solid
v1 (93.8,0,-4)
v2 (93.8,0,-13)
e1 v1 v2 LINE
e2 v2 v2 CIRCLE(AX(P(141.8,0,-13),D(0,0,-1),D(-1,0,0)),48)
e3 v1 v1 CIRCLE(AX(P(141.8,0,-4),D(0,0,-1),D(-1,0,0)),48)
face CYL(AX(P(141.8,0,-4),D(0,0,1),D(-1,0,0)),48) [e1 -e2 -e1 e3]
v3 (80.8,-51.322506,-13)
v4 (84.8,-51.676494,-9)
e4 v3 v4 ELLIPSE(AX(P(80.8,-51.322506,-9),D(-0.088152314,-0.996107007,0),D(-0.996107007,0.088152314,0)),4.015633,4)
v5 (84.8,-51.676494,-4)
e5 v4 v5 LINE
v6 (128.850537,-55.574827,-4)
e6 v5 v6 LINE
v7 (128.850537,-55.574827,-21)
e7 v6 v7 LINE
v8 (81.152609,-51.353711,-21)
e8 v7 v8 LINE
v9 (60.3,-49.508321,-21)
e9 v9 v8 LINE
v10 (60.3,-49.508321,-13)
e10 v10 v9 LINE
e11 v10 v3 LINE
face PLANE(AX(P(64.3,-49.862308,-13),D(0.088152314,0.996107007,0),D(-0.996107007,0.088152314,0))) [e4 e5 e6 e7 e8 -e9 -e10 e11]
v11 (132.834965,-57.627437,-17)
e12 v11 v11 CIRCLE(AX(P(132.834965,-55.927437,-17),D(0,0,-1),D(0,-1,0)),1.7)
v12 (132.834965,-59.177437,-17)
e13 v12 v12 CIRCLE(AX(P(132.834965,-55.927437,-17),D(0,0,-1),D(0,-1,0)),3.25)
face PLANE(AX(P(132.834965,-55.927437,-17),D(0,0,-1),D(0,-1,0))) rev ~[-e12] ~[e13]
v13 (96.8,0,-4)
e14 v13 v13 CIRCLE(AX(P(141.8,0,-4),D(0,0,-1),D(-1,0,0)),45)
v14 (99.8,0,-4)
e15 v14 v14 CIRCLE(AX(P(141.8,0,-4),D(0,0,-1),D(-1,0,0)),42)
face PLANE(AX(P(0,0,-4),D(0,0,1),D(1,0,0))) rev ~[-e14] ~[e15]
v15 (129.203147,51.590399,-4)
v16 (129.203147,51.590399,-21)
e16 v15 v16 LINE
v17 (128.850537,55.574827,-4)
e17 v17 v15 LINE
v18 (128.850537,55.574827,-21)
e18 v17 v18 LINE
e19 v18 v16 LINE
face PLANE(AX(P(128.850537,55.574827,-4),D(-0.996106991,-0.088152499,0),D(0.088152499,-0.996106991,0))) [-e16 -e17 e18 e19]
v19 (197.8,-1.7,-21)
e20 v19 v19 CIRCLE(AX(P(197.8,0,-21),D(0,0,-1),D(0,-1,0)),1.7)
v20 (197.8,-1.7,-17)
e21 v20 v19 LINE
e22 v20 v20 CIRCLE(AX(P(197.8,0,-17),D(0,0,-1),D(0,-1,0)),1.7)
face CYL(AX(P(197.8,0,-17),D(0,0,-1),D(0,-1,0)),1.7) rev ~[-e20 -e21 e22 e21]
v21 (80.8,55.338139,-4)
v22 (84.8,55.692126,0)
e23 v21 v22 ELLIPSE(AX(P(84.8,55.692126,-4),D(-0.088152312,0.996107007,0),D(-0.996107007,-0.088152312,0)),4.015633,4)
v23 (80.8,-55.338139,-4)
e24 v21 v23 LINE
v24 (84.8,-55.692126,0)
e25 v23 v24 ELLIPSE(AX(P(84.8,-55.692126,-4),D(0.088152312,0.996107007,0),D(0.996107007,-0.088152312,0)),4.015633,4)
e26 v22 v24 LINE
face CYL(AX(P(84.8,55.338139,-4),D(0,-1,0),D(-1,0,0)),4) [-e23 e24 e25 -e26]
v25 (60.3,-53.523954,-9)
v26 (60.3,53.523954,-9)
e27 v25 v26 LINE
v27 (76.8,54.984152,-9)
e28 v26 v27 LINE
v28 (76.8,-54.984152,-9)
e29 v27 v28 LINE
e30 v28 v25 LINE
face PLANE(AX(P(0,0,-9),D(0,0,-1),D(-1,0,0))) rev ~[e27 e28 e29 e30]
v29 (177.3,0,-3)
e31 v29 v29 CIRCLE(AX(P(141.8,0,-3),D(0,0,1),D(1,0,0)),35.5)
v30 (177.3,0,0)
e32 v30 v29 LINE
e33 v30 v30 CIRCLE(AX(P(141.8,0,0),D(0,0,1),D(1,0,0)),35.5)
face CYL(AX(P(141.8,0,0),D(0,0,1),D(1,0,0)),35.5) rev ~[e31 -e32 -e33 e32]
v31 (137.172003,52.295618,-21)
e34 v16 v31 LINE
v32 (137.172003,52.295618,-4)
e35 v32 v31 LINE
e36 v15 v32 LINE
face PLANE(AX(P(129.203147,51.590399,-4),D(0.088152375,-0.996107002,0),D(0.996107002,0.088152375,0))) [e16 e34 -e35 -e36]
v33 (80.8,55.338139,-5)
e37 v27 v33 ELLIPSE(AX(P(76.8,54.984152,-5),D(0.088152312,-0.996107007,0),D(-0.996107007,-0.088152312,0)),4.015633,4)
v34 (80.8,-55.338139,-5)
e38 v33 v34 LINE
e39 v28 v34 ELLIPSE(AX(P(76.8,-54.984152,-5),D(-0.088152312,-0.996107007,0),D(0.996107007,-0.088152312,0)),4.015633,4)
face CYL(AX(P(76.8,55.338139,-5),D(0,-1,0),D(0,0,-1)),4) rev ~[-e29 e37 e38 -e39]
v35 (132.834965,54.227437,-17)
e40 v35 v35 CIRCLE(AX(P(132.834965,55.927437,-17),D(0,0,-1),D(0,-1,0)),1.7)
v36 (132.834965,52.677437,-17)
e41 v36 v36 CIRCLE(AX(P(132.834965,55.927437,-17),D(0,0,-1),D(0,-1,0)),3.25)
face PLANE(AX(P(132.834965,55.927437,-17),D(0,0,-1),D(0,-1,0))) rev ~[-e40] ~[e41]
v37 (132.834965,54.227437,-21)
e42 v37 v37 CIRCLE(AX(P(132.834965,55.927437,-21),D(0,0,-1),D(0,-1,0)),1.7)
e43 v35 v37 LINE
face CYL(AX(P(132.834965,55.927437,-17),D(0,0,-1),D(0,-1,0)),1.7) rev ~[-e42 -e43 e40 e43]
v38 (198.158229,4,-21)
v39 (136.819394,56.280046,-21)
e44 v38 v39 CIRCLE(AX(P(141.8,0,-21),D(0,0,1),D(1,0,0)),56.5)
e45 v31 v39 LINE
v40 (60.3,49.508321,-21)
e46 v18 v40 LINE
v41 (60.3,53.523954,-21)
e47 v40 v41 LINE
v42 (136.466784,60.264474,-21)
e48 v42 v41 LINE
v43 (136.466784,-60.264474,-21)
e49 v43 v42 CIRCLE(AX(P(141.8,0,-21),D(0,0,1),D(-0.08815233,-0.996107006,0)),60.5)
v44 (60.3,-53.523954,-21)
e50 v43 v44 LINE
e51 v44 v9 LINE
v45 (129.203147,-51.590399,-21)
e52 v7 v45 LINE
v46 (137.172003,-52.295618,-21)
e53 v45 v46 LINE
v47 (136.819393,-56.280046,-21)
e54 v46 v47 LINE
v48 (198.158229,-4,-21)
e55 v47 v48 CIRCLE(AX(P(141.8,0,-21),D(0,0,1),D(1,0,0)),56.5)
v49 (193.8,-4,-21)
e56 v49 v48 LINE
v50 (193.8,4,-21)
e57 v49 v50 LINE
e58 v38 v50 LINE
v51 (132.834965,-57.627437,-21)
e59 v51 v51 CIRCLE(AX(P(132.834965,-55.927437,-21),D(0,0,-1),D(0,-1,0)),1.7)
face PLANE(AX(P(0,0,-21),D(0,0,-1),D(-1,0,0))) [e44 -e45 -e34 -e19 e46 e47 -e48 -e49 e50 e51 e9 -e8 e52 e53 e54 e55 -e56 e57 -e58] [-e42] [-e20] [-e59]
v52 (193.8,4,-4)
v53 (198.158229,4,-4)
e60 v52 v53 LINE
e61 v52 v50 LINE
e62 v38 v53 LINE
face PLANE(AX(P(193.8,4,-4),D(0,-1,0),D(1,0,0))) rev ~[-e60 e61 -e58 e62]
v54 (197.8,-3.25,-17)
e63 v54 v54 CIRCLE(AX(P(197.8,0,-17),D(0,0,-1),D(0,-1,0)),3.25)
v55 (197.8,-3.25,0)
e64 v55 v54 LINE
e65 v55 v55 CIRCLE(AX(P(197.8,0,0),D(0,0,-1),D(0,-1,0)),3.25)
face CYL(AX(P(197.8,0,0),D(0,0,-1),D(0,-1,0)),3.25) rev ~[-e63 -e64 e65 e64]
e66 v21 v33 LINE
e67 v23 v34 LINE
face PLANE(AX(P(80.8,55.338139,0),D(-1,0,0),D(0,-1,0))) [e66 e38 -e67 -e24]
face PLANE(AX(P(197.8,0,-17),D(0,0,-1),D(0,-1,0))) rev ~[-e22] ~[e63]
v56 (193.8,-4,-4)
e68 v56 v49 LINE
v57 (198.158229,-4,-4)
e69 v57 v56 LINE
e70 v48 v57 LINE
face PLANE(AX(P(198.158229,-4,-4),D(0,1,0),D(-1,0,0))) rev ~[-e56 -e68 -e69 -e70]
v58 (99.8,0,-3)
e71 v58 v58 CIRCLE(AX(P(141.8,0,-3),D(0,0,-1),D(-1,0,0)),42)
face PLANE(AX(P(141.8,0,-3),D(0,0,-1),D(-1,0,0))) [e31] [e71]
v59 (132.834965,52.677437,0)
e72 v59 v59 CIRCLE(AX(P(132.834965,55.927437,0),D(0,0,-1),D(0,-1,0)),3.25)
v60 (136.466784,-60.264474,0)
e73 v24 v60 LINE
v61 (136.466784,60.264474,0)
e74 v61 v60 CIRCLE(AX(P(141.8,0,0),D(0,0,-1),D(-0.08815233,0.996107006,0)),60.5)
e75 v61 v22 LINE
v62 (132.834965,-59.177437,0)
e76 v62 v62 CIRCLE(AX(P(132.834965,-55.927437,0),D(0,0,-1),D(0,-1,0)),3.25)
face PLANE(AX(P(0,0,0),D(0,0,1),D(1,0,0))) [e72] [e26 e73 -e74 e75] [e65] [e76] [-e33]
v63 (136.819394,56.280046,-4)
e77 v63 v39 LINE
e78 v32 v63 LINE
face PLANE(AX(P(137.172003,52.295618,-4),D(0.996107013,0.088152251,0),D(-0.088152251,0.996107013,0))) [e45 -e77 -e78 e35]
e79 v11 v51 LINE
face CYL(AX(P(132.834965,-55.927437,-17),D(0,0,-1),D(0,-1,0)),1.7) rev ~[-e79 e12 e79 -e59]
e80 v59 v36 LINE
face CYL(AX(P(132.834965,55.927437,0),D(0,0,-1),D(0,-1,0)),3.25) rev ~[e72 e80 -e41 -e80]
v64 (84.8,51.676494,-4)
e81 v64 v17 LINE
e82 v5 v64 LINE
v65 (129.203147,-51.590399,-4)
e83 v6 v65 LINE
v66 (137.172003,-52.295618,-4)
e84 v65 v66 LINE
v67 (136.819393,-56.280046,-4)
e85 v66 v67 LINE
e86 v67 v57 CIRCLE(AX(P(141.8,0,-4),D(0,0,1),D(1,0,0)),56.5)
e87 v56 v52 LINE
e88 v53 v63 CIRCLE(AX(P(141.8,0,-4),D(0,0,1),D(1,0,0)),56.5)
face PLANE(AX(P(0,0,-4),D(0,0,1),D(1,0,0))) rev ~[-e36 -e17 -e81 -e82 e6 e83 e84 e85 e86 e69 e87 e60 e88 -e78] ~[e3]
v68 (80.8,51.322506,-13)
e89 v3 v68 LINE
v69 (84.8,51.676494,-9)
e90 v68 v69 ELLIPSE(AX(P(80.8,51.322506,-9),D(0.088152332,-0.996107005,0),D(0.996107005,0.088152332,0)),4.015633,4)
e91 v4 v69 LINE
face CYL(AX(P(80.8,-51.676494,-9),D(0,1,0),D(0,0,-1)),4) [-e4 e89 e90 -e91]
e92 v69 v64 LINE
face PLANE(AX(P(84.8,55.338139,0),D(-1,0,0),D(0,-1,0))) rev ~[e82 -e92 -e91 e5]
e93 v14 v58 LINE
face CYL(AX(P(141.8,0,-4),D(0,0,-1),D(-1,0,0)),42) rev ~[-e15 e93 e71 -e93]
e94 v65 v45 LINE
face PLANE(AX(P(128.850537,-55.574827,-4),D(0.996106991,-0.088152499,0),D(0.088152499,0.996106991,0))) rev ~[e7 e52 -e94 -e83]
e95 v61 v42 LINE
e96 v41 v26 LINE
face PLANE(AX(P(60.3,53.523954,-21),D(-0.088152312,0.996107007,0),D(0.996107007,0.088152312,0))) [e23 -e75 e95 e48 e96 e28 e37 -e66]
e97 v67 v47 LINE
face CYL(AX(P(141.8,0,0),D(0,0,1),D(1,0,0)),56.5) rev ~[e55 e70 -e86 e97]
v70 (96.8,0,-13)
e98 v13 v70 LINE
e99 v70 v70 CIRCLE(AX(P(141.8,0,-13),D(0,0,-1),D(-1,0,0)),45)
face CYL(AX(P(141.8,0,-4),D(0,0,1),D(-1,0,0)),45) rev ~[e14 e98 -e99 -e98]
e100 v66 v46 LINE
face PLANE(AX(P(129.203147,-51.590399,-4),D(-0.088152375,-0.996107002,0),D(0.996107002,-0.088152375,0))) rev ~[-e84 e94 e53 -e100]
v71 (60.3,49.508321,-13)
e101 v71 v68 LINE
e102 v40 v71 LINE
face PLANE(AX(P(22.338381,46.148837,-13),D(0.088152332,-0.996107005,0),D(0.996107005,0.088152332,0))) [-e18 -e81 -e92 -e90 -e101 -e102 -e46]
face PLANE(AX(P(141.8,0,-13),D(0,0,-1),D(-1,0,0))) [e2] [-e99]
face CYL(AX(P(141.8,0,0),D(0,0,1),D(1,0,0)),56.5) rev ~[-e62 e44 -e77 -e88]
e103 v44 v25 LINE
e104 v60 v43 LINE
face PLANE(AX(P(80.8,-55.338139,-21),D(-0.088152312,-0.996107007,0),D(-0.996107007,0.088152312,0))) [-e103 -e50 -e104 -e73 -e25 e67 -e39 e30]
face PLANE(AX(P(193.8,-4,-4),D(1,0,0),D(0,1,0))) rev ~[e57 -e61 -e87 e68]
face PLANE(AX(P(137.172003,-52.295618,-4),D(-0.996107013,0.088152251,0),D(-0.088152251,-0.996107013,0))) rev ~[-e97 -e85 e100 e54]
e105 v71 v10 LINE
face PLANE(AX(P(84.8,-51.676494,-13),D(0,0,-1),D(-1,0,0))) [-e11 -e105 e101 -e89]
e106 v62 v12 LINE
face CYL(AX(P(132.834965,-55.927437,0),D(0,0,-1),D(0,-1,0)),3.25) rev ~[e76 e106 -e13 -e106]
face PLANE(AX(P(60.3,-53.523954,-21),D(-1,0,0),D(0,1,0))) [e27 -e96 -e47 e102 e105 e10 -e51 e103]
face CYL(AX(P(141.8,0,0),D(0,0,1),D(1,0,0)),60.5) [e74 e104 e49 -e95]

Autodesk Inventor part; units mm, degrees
ref_plane "YZ Plane" through (0, 0, 0) normal (1, 0, 0) x (0, 1, 0)
ref_plane "XZ Plane" through (0, 0, 0) normal (0, 1, 0) x (-1, 0, 0)
ref_plane "XY Plane" through (0, 0, 0) normal (0, 0, 1) x (1, 0, 0)
sketch "Sketch1" plane through (0, 0, 0) normal (0, 0, 1) x (1, 0, 0)
  circle A0 centre (0, 0) radius 48
  circle A1 centre (141.8, 0) radius 60.5
  line L0 (136.466784, 60.264474) -> (-4.231312, 47.813136)
  line L1 (-4.231312, -47.813136) -> (136.466784, -60.264474)
  line L2 (80.8, 55.338139) -> (80.8, -55.338139)
  dimension "d0" = 96
  dimension "d1" = 121
  dimension "d2" = 141.8
  dimension "d3" = 61
extrude "Extrusion1" add sketch "Sketch1" against normal blind 21 contours L0 A1 L1 L2 | A1
sketch "Sketch2" plane through (0, 0, -21) normal (0, 0, -1) x (-1, 0, 0)
  line L0 (-80.8, -55.338139) -> (-60.3, -53.523954)
  line L1 (-60.3, -53.523954) -> (-60.3, 53.523954)
  line L2 (-60.3, 53.523954) -> (-80.8, 55.338139)
  line L3 (-80.8, 55.338139) -> (-80.8, -55.338139)
  line L4 (-136.466784, -60.264474) -> (-80.8, -55.338139)
  line L5 (-80.8, 55.338139) -> (-136.466784, 60.264474)
  line L6 (-80.8, -55.338139) -> (-80.8, 55.338139)
  point P0 (0, 0)
  dimension "d7" = 20.5
extrude "Extrusion2" add sketch "Sketch2" against normal blind 12
shell "Shell1" thickness 4 removed faces 1 at (111.077856, 17.841318, -21)
sketch "Sketch3" plane through (141.8, 0, -4) normal (0, 0, -1) x (-1, 0, 0)
  circle A0 centre (0, 0) radius 42
  point P0 (141.8, 0)
  dimension "d10" = 84
extrude "Extrusion3" cut sketch "Sketch3" against normal blind 1
sketch "Sketch4" plane through (0, 0, 0) normal (0, 0, 1) x (1, 0, 0)
  circle A0 centre (141.8, 0) radius 42 projected
  circle A1 centre (141.8, 0) radius 35.5
  point P0 (0, 0)
  dimension "d13" = 71
extrude "Extrusion4" cut sketch "Sketch4" against normal through all contours A1
sketch "Sketch5" plane through (141.8, 0, -4) normal (0, 0, -1) x (-1, 0, 0)
  circle A0 centre (0, 0) radius 45
  circle A1 centre (0, 0) radius 48
  point P0 (141.8, 0)
  dimension "d16" = 90
  dimension "d17" = 96
extrude "Extrusion5" add sketch "Sketch5" along normal blind 9
sketch "Sketch6" plane through (84.8, -51.676494, -13) normal (0, 0, -1) x (-1, 0, 0)
  line L0 (8.632076, 0.763912) -> (62.461619, 5.527656)
  line L1 (62.461619, 5.527656) -> (62.461619, 97.825331)
  line L2 (62.461619, 97.825331) -> (8.632076, 102.589076)
  line L3 (8.632076, 102.589076) -> (8.632076, 0.763912)
  line L4 (20.5, 1.814185) -> (-52.019394, -4.603552)
  line L5 (-52.019394, 107.956539) -> (20.5, 101.538802)
extrude "Extrusion6" cut sketch "Sketch6" along normal through all
fillet "Fillet1" radius 4 3 edges at (84.8, 0, -13) (80.8, 0, -9) (80.8, 0, 0)
sketch "Sketch7" plane through (141.8, 0, -4) normal (0, 0, -1) x (-1, 0, 0)
  line L0 (-52, 4) -> (-60, 4)
  line L1 (-60, 4) -> (-60, -4)
  line L2 (-60, -4) -> (-52, -4)
  line L3 (-52, -4) -> (-52, 4)
  line L4 (-52, 4) -> (-60, -4) construction
  line L5 (-60, 4) -> (-52, -4) construction
  arc A0 (4.980606, 56.280046) -> (4.980606, -56.280046) centre (0, 0) ccw
  line L6 (4.980606, -56.280046) -> (12.949463, -55.574827)
  line L7 (12.949463, -55.574827) -> (12.596853, -51.590399)
  line L8 (12.596853, -51.590399) -> (4.627997, -52.295618)
  line L9 (4.627997, -52.295618) -> (4.980606, -56.280046)
  line L10 (4.980606, 56.280046) -> (57, 51.676494)
  line L11 (4.980606, 56.280046) -> (12.949463, 55.574827)
  line L12 (12.949463, 55.574827) -> (12.596853, 51.590399)
  line L13 (12.596853, 51.590399) -> (4.627997, 52.295618)
  line L14 (4.627997, 52.295618) -> (4.980606, 56.280046)
  point P0 (141.8, 0)
  point P1 (-56, 0)
  dimension "d24" = 4
  dimension "d25" = 4
  dimension "d26" = 8
  dimension "d27" = 8
  dimension "d28" = 8
  dimension "d29" = 56
extrude "Extrusion7" add sketch "Sketch7" along normal up to surface (17 mm away)
sketch "Sketch8" plane through (0, 0, 0) normal (0, 0, -1) x (-1, 0, 0)
  line L0 (-60.3, -49.508321) -> (-128.850537, -55.574827)
  line L1 (-128.850537, 55.574827) -> (-60.3, 49.508321)
  circle A0 centre (-141.8, 0) radius 35.5
  line L2 (-128.850537, -55.574827) -> (-129.203147, -51.590399)
  line L3 (-129.203147, 51.590399) -> (-128.850537, 55.574827)
  point P0 (0, 0)
  point P1 (-197.8, 0)
  point P2 (-132.834965, -55.927437)
  point P3 (-132.834965, 55.927437)
  dimension "d32" = 56
  dimension "d33" = 4
  dimension "d34" = 4
hole "Hole1" at (197.8, 0, 0) at (132.834965, -55.927437, 0) at (132.834965, 55.927437, 0) direction (0, 0, -1) diameter 3.4 end through all counterbore diameter 6.5 counterbore depth 17 clearance for "Socket Head Cap Screw DIN EN ISO 4762" size "M3" standard "DIN"
sketch "Sketch9" plane through (0, 0, 0) normal (0, 0, 1) x (1, 0, 0)
  circle A0 centre (125.937089, 54.374793) radius 1.7
  circle A1 centre (132.834965, -55.927437) radius 1.7
  circle A2 centre (197.8, 0) radius 1.7
  point P0 (0, 0)
equation "\"d25\" = d24"
equation "\"d27\" = d26"
equation "\"d28\" = d26"
properties part number "J1-sketch"
